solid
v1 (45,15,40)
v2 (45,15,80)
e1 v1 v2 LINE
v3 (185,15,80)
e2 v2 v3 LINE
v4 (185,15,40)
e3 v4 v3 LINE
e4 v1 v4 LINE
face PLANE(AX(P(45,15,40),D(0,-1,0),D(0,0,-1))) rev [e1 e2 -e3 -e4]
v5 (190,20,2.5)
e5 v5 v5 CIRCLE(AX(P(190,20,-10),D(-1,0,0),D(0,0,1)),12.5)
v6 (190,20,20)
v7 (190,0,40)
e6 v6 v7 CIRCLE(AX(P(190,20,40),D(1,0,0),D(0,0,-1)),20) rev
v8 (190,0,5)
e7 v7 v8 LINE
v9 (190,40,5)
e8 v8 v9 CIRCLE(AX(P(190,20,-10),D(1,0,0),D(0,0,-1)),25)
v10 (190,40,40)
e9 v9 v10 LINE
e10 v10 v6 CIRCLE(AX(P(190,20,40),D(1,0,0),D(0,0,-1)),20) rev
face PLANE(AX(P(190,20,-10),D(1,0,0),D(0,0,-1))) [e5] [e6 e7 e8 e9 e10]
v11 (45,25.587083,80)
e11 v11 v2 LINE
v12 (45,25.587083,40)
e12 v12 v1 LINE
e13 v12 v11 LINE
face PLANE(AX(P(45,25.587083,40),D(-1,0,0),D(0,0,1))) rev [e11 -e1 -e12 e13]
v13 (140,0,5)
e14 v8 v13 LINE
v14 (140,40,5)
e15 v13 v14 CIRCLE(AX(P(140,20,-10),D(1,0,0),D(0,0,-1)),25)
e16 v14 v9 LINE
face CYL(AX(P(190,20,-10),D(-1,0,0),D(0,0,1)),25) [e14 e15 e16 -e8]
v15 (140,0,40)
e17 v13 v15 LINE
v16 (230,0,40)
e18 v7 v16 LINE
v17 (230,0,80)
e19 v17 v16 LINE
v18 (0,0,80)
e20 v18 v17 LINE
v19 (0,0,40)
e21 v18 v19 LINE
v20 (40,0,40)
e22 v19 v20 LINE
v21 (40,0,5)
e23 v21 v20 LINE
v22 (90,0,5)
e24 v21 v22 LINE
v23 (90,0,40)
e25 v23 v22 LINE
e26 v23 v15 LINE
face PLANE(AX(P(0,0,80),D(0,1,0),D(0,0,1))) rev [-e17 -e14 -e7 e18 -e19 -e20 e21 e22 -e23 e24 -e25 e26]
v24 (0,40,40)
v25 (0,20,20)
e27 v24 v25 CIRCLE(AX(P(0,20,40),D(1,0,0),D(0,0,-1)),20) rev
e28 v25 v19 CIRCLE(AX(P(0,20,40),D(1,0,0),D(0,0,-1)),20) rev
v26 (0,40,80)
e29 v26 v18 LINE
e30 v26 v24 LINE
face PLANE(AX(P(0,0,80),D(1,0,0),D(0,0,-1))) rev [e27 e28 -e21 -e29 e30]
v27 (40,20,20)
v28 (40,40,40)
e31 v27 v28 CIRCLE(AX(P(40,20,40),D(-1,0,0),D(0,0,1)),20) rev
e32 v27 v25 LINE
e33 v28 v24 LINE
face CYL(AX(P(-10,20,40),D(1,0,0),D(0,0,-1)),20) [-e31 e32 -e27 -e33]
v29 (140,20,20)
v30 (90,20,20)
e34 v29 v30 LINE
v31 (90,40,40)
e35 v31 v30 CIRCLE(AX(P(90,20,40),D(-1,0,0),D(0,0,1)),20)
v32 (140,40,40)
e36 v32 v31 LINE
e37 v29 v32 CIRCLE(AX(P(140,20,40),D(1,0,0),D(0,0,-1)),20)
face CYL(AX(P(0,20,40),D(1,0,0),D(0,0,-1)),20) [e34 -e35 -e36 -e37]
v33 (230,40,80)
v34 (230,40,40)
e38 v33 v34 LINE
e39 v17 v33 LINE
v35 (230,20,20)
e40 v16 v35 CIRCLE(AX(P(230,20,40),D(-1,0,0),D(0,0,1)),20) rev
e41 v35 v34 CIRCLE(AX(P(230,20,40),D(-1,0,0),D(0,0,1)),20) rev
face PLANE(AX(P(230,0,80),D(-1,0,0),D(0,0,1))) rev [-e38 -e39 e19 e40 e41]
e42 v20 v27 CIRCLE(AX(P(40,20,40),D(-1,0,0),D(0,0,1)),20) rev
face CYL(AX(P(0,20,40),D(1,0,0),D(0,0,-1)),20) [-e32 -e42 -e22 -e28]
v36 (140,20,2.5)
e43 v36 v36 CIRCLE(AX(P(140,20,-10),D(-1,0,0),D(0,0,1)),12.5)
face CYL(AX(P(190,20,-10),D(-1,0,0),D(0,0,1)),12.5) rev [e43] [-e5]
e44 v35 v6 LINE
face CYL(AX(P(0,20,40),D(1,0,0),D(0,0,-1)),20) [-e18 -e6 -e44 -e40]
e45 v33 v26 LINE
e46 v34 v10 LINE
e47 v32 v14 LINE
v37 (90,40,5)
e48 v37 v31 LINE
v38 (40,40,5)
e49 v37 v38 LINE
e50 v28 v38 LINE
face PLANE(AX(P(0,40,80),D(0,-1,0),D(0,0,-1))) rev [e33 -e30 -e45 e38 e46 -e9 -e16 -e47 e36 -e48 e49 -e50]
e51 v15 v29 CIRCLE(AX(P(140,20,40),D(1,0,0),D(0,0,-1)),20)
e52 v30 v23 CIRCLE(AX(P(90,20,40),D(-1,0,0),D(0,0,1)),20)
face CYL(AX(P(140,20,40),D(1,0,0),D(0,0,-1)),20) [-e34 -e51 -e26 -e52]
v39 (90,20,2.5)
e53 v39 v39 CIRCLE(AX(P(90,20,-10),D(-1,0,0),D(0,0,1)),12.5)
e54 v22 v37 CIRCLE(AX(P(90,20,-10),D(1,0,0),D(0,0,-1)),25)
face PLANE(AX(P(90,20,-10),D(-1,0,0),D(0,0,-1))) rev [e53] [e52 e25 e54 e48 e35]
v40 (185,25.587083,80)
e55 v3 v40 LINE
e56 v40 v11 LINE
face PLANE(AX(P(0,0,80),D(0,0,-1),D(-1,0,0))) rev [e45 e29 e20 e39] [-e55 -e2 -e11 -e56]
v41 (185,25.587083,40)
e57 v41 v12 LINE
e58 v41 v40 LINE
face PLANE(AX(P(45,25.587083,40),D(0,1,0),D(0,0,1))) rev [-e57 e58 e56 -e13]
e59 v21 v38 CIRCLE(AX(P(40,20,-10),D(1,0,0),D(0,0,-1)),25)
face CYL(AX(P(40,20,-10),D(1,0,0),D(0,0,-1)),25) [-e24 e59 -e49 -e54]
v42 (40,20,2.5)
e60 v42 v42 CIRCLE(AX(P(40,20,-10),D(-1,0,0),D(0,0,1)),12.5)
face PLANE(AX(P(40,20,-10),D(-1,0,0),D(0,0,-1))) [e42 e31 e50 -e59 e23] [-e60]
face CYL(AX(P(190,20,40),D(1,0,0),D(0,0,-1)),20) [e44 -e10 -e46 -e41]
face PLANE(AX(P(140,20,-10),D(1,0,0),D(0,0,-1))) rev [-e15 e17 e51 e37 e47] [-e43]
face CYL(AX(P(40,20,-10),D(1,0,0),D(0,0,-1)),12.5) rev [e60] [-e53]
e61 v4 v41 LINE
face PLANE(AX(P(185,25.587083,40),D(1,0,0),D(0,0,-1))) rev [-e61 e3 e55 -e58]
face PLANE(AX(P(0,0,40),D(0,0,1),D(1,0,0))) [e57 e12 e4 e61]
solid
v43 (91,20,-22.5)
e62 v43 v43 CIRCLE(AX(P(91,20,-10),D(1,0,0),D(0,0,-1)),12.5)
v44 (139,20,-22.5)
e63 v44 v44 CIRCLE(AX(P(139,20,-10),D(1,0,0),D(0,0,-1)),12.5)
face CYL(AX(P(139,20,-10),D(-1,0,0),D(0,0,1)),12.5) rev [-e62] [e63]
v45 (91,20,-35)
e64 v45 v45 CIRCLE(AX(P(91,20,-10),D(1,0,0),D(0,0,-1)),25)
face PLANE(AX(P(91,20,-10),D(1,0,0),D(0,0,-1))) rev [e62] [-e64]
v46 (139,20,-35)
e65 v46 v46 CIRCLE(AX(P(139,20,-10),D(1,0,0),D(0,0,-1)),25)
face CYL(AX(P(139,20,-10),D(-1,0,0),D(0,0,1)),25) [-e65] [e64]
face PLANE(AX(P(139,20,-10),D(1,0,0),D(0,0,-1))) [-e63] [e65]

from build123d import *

# Parameters (mm, degrees)
SKETCH2_W            = 230
SKETCH2_H            = 40
BOSS_EXTRUDE1_DEPTH  = 80
SKETCH20_W           = 140
SKETCH20_H           = 10.587082732
CUT_EXTRUDE7_DEPTH   = 40
SKETCH6_R            = 25
BOSS_EXTRUDE3_DEPTH  = 50
SKETCH7_R            = 12.5
CUT_EXTRUDE2_DEPTH   = 50
SKETCH8_R            = 26.5
CUT_EXTRUDE3_DEPTH   = 25
CUT_EXTRUDE4_START   = 40
SKETCH11_R           = 26.5
CUT_EXTRUDE4_DEPTH   = 40
SKETCH14_W           = 12.614661349
SKETCH14_H           = 40
CUT_EXTRUDE6_DEPTH   = 50
FILLET3_R            = 20
FILLET3_OF_MIRROR5_R = 20
FILLET3_OF_MIRROR8_R = 20
SKETCH21_R           = 25
BOSS_EXTRUDE5_DEPTH  = 48
SKETCH22_R           = 12.5
CUT_EXTRUDE8_DEPTH   = 48


with BuildPart() as part:
    # Sketch2 → Boss-Extrude1 (new body)
    with BuildSketch(Plane.XY):
        with Locations((115, 20)):
            Rectangle(SKETCH2_W, SKETCH2_H)
    extrude(amount=BOSS_EXTRUDE1_DEPTH)

    # Sketch20 → Cut-Extrude7 (cut)
    with BuildSketch(Plane.XY.offset(80)):
        with Locations((115, 20.293541366)):
            Rectangle(SKETCH20_W, SKETCH20_H)
    extrude(amount=-CUT_EXTRUDE7_DEPTH, mode=Mode.SUBTRACT)

    # Sketch6 → Boss-Extrude3 (add)
    with BuildSketch(Plane(origin=(140, 0, 0), x_dir=(0, 0, -1), z_dir=(1, 0, 0))):
        with Locations((10, 20)):
            Circle(SKETCH6_R)
    boss_extrude3 = extrude(amount=BOSS_EXTRUDE3_DEPTH)

    # Sketch7 → Cut-Extrude2 (cut)
    with BuildSketch(Plane.ZY.offset(-140)):
        with Locations(Location((-10, 20, 0), (0, 0, 36.869897646))):
            Circle(SKETCH7_R)
    cut_extrude2 = extrude(amount=-CUT_EXTRUDE2_DEPTH, mode=Mode.SUBTRACT)

    # Sketch8 → Cut-Extrude3 (cut)
    with BuildSketch(Plane.ZY.offset(-140)):
        with Locations((-10, 20)):
            Circle(SKETCH8_R)
    cut_extrude3 = extrude(amount=CUT_EXTRUDE3_DEPTH, mode=Mode.SUBTRACT)

    # Sketch11 → Cut-Extrude4 (cut)
    with BuildSketch(Plane(origin=(190, 0, 0), x_dir=(0, 0, -1), z_dir=(1, 0, 0)).offset(CUT_EXTRUDE4_START)):
        with Locations((10, 20)):
            Circle(SKETCH11_R)
    cut_extrude4 = extrude(amount=-CUT_EXTRUDE4_DEPTH, mode=Mode.SUBTRACT)

    # Mirror1: Boss-Extrude3, Cut-Extrude2, Cut-Extrude3, Cut-Extrude4 across plane
    add(boss_extrude3.mirror(Plane(origin=(115, 0, 0), x_dir=(0, 0, 1), z_dir=(1, 0, 0))))
    add(cut_extrude2.mirror(Plane(origin=(115, 0, 0), x_dir=(0, 0, 1), z_dir=(1, 0, 0))), mode=Mode.SUBTRACT)
    add(cut_extrude3.mirror(Plane(origin=(115, 0, 0), x_dir=(0, 0, 1), z_dir=(1, 0, 0))), mode=Mode.SUBTRACT)
    add(cut_extrude4.mirror(Plane(origin=(115, 0, 0), x_dir=(0, 0, 1), z_dir=(1, 0, 0))), mode=Mode.SUBTRACT)

    # Sketch14 → Cut-Extrude6 (cut)
    with BuildSketch(Plane(origin=(90, 0, 0), x_dir=(0, 0, -1), z_dir=(1, 0, 0))):
        with Locations((-13.692669326, 20)):
            Rectangle(SKETCH14_W, SKETCH14_H)
    cut_extrude6 = extrude(amount=CUT_EXTRUDE6_DEPTH, mode=Mode.SUBTRACT)

    # Fillet3
    fillet3_edges = [part.edges().sort_by_distance(p)[0] for p in [
        (115, 40, 20),
        (115, 0, 20),
    ]]
    fillet(fillet3_edges, radius=FILLET3_R - 0.0001)  # a hair under: the kernel refuses the full size

    # Mirror5: Cut-Extrude6 across plane
    add(cut_extrude6.mirror(Plane.ZY.offset(-165)), mode=Mode.SUBTRACT)

    # Fillet3 of Mirror5
    fillet3_of_mirror5_edges = [part.edges().sort_by_distance(p)[0] for p in [
        (210, 40, 20),
        (210, 0, 20),
    ]]
    fillet(fillet3_of_mirror5_edges, radius=FILLET3_OF_MIRROR5_R - 0.0001)  # a hair under: the kernel refuses the full size

    # Mirror8: Cut-Extrude6 across plane
    add(cut_extrude6.mirror(Plane(origin=(65, 0, 0), x_dir=(0, 0, 1), z_dir=(1, 0, 0))), mode=Mode.SUBTRACT)

    # Fillet3 of Mirror8
    fillet3_of_mirror8_edges = [part.edges().sort_by_distance(p)[0] for p in [
        (20, 40, 20),
        (20, 0, 20),
    ]]
    fillet(fillet3_of_mirror8_edges, radius=FILLET3_OF_MIRROR8_R - 0.0001)  # a hair under: the kernel refuses the full size


with BuildPart() as body_2:
    # Sketch21 → Boss-Extrude5 (new body)
    with BuildSketch(Plane(origin=(91, 0, 0), x_dir=(0, 0, -1), z_dir=(1, 0, 0))):
        with Locations((10, 20)):
            Circle(SKETCH21_R)
    extrude(amount=BOSS_EXTRUDE5_DEPTH)

    # Sketch22 → Cut-Extrude8 (cut)
    with BuildSketch(Plane(origin=(91, 0, 0), x_dir=(0, 0, -1), z_dir=(1, 0, 0))):
        with Locations((10, 20)):
            Circle(SKETCH22_R)
    extrude(amount=CUT_EXTRUDE8_DEPTH, mode=Mode.SUBTRACT)


solid = Compound([part.part, body_2.part])
